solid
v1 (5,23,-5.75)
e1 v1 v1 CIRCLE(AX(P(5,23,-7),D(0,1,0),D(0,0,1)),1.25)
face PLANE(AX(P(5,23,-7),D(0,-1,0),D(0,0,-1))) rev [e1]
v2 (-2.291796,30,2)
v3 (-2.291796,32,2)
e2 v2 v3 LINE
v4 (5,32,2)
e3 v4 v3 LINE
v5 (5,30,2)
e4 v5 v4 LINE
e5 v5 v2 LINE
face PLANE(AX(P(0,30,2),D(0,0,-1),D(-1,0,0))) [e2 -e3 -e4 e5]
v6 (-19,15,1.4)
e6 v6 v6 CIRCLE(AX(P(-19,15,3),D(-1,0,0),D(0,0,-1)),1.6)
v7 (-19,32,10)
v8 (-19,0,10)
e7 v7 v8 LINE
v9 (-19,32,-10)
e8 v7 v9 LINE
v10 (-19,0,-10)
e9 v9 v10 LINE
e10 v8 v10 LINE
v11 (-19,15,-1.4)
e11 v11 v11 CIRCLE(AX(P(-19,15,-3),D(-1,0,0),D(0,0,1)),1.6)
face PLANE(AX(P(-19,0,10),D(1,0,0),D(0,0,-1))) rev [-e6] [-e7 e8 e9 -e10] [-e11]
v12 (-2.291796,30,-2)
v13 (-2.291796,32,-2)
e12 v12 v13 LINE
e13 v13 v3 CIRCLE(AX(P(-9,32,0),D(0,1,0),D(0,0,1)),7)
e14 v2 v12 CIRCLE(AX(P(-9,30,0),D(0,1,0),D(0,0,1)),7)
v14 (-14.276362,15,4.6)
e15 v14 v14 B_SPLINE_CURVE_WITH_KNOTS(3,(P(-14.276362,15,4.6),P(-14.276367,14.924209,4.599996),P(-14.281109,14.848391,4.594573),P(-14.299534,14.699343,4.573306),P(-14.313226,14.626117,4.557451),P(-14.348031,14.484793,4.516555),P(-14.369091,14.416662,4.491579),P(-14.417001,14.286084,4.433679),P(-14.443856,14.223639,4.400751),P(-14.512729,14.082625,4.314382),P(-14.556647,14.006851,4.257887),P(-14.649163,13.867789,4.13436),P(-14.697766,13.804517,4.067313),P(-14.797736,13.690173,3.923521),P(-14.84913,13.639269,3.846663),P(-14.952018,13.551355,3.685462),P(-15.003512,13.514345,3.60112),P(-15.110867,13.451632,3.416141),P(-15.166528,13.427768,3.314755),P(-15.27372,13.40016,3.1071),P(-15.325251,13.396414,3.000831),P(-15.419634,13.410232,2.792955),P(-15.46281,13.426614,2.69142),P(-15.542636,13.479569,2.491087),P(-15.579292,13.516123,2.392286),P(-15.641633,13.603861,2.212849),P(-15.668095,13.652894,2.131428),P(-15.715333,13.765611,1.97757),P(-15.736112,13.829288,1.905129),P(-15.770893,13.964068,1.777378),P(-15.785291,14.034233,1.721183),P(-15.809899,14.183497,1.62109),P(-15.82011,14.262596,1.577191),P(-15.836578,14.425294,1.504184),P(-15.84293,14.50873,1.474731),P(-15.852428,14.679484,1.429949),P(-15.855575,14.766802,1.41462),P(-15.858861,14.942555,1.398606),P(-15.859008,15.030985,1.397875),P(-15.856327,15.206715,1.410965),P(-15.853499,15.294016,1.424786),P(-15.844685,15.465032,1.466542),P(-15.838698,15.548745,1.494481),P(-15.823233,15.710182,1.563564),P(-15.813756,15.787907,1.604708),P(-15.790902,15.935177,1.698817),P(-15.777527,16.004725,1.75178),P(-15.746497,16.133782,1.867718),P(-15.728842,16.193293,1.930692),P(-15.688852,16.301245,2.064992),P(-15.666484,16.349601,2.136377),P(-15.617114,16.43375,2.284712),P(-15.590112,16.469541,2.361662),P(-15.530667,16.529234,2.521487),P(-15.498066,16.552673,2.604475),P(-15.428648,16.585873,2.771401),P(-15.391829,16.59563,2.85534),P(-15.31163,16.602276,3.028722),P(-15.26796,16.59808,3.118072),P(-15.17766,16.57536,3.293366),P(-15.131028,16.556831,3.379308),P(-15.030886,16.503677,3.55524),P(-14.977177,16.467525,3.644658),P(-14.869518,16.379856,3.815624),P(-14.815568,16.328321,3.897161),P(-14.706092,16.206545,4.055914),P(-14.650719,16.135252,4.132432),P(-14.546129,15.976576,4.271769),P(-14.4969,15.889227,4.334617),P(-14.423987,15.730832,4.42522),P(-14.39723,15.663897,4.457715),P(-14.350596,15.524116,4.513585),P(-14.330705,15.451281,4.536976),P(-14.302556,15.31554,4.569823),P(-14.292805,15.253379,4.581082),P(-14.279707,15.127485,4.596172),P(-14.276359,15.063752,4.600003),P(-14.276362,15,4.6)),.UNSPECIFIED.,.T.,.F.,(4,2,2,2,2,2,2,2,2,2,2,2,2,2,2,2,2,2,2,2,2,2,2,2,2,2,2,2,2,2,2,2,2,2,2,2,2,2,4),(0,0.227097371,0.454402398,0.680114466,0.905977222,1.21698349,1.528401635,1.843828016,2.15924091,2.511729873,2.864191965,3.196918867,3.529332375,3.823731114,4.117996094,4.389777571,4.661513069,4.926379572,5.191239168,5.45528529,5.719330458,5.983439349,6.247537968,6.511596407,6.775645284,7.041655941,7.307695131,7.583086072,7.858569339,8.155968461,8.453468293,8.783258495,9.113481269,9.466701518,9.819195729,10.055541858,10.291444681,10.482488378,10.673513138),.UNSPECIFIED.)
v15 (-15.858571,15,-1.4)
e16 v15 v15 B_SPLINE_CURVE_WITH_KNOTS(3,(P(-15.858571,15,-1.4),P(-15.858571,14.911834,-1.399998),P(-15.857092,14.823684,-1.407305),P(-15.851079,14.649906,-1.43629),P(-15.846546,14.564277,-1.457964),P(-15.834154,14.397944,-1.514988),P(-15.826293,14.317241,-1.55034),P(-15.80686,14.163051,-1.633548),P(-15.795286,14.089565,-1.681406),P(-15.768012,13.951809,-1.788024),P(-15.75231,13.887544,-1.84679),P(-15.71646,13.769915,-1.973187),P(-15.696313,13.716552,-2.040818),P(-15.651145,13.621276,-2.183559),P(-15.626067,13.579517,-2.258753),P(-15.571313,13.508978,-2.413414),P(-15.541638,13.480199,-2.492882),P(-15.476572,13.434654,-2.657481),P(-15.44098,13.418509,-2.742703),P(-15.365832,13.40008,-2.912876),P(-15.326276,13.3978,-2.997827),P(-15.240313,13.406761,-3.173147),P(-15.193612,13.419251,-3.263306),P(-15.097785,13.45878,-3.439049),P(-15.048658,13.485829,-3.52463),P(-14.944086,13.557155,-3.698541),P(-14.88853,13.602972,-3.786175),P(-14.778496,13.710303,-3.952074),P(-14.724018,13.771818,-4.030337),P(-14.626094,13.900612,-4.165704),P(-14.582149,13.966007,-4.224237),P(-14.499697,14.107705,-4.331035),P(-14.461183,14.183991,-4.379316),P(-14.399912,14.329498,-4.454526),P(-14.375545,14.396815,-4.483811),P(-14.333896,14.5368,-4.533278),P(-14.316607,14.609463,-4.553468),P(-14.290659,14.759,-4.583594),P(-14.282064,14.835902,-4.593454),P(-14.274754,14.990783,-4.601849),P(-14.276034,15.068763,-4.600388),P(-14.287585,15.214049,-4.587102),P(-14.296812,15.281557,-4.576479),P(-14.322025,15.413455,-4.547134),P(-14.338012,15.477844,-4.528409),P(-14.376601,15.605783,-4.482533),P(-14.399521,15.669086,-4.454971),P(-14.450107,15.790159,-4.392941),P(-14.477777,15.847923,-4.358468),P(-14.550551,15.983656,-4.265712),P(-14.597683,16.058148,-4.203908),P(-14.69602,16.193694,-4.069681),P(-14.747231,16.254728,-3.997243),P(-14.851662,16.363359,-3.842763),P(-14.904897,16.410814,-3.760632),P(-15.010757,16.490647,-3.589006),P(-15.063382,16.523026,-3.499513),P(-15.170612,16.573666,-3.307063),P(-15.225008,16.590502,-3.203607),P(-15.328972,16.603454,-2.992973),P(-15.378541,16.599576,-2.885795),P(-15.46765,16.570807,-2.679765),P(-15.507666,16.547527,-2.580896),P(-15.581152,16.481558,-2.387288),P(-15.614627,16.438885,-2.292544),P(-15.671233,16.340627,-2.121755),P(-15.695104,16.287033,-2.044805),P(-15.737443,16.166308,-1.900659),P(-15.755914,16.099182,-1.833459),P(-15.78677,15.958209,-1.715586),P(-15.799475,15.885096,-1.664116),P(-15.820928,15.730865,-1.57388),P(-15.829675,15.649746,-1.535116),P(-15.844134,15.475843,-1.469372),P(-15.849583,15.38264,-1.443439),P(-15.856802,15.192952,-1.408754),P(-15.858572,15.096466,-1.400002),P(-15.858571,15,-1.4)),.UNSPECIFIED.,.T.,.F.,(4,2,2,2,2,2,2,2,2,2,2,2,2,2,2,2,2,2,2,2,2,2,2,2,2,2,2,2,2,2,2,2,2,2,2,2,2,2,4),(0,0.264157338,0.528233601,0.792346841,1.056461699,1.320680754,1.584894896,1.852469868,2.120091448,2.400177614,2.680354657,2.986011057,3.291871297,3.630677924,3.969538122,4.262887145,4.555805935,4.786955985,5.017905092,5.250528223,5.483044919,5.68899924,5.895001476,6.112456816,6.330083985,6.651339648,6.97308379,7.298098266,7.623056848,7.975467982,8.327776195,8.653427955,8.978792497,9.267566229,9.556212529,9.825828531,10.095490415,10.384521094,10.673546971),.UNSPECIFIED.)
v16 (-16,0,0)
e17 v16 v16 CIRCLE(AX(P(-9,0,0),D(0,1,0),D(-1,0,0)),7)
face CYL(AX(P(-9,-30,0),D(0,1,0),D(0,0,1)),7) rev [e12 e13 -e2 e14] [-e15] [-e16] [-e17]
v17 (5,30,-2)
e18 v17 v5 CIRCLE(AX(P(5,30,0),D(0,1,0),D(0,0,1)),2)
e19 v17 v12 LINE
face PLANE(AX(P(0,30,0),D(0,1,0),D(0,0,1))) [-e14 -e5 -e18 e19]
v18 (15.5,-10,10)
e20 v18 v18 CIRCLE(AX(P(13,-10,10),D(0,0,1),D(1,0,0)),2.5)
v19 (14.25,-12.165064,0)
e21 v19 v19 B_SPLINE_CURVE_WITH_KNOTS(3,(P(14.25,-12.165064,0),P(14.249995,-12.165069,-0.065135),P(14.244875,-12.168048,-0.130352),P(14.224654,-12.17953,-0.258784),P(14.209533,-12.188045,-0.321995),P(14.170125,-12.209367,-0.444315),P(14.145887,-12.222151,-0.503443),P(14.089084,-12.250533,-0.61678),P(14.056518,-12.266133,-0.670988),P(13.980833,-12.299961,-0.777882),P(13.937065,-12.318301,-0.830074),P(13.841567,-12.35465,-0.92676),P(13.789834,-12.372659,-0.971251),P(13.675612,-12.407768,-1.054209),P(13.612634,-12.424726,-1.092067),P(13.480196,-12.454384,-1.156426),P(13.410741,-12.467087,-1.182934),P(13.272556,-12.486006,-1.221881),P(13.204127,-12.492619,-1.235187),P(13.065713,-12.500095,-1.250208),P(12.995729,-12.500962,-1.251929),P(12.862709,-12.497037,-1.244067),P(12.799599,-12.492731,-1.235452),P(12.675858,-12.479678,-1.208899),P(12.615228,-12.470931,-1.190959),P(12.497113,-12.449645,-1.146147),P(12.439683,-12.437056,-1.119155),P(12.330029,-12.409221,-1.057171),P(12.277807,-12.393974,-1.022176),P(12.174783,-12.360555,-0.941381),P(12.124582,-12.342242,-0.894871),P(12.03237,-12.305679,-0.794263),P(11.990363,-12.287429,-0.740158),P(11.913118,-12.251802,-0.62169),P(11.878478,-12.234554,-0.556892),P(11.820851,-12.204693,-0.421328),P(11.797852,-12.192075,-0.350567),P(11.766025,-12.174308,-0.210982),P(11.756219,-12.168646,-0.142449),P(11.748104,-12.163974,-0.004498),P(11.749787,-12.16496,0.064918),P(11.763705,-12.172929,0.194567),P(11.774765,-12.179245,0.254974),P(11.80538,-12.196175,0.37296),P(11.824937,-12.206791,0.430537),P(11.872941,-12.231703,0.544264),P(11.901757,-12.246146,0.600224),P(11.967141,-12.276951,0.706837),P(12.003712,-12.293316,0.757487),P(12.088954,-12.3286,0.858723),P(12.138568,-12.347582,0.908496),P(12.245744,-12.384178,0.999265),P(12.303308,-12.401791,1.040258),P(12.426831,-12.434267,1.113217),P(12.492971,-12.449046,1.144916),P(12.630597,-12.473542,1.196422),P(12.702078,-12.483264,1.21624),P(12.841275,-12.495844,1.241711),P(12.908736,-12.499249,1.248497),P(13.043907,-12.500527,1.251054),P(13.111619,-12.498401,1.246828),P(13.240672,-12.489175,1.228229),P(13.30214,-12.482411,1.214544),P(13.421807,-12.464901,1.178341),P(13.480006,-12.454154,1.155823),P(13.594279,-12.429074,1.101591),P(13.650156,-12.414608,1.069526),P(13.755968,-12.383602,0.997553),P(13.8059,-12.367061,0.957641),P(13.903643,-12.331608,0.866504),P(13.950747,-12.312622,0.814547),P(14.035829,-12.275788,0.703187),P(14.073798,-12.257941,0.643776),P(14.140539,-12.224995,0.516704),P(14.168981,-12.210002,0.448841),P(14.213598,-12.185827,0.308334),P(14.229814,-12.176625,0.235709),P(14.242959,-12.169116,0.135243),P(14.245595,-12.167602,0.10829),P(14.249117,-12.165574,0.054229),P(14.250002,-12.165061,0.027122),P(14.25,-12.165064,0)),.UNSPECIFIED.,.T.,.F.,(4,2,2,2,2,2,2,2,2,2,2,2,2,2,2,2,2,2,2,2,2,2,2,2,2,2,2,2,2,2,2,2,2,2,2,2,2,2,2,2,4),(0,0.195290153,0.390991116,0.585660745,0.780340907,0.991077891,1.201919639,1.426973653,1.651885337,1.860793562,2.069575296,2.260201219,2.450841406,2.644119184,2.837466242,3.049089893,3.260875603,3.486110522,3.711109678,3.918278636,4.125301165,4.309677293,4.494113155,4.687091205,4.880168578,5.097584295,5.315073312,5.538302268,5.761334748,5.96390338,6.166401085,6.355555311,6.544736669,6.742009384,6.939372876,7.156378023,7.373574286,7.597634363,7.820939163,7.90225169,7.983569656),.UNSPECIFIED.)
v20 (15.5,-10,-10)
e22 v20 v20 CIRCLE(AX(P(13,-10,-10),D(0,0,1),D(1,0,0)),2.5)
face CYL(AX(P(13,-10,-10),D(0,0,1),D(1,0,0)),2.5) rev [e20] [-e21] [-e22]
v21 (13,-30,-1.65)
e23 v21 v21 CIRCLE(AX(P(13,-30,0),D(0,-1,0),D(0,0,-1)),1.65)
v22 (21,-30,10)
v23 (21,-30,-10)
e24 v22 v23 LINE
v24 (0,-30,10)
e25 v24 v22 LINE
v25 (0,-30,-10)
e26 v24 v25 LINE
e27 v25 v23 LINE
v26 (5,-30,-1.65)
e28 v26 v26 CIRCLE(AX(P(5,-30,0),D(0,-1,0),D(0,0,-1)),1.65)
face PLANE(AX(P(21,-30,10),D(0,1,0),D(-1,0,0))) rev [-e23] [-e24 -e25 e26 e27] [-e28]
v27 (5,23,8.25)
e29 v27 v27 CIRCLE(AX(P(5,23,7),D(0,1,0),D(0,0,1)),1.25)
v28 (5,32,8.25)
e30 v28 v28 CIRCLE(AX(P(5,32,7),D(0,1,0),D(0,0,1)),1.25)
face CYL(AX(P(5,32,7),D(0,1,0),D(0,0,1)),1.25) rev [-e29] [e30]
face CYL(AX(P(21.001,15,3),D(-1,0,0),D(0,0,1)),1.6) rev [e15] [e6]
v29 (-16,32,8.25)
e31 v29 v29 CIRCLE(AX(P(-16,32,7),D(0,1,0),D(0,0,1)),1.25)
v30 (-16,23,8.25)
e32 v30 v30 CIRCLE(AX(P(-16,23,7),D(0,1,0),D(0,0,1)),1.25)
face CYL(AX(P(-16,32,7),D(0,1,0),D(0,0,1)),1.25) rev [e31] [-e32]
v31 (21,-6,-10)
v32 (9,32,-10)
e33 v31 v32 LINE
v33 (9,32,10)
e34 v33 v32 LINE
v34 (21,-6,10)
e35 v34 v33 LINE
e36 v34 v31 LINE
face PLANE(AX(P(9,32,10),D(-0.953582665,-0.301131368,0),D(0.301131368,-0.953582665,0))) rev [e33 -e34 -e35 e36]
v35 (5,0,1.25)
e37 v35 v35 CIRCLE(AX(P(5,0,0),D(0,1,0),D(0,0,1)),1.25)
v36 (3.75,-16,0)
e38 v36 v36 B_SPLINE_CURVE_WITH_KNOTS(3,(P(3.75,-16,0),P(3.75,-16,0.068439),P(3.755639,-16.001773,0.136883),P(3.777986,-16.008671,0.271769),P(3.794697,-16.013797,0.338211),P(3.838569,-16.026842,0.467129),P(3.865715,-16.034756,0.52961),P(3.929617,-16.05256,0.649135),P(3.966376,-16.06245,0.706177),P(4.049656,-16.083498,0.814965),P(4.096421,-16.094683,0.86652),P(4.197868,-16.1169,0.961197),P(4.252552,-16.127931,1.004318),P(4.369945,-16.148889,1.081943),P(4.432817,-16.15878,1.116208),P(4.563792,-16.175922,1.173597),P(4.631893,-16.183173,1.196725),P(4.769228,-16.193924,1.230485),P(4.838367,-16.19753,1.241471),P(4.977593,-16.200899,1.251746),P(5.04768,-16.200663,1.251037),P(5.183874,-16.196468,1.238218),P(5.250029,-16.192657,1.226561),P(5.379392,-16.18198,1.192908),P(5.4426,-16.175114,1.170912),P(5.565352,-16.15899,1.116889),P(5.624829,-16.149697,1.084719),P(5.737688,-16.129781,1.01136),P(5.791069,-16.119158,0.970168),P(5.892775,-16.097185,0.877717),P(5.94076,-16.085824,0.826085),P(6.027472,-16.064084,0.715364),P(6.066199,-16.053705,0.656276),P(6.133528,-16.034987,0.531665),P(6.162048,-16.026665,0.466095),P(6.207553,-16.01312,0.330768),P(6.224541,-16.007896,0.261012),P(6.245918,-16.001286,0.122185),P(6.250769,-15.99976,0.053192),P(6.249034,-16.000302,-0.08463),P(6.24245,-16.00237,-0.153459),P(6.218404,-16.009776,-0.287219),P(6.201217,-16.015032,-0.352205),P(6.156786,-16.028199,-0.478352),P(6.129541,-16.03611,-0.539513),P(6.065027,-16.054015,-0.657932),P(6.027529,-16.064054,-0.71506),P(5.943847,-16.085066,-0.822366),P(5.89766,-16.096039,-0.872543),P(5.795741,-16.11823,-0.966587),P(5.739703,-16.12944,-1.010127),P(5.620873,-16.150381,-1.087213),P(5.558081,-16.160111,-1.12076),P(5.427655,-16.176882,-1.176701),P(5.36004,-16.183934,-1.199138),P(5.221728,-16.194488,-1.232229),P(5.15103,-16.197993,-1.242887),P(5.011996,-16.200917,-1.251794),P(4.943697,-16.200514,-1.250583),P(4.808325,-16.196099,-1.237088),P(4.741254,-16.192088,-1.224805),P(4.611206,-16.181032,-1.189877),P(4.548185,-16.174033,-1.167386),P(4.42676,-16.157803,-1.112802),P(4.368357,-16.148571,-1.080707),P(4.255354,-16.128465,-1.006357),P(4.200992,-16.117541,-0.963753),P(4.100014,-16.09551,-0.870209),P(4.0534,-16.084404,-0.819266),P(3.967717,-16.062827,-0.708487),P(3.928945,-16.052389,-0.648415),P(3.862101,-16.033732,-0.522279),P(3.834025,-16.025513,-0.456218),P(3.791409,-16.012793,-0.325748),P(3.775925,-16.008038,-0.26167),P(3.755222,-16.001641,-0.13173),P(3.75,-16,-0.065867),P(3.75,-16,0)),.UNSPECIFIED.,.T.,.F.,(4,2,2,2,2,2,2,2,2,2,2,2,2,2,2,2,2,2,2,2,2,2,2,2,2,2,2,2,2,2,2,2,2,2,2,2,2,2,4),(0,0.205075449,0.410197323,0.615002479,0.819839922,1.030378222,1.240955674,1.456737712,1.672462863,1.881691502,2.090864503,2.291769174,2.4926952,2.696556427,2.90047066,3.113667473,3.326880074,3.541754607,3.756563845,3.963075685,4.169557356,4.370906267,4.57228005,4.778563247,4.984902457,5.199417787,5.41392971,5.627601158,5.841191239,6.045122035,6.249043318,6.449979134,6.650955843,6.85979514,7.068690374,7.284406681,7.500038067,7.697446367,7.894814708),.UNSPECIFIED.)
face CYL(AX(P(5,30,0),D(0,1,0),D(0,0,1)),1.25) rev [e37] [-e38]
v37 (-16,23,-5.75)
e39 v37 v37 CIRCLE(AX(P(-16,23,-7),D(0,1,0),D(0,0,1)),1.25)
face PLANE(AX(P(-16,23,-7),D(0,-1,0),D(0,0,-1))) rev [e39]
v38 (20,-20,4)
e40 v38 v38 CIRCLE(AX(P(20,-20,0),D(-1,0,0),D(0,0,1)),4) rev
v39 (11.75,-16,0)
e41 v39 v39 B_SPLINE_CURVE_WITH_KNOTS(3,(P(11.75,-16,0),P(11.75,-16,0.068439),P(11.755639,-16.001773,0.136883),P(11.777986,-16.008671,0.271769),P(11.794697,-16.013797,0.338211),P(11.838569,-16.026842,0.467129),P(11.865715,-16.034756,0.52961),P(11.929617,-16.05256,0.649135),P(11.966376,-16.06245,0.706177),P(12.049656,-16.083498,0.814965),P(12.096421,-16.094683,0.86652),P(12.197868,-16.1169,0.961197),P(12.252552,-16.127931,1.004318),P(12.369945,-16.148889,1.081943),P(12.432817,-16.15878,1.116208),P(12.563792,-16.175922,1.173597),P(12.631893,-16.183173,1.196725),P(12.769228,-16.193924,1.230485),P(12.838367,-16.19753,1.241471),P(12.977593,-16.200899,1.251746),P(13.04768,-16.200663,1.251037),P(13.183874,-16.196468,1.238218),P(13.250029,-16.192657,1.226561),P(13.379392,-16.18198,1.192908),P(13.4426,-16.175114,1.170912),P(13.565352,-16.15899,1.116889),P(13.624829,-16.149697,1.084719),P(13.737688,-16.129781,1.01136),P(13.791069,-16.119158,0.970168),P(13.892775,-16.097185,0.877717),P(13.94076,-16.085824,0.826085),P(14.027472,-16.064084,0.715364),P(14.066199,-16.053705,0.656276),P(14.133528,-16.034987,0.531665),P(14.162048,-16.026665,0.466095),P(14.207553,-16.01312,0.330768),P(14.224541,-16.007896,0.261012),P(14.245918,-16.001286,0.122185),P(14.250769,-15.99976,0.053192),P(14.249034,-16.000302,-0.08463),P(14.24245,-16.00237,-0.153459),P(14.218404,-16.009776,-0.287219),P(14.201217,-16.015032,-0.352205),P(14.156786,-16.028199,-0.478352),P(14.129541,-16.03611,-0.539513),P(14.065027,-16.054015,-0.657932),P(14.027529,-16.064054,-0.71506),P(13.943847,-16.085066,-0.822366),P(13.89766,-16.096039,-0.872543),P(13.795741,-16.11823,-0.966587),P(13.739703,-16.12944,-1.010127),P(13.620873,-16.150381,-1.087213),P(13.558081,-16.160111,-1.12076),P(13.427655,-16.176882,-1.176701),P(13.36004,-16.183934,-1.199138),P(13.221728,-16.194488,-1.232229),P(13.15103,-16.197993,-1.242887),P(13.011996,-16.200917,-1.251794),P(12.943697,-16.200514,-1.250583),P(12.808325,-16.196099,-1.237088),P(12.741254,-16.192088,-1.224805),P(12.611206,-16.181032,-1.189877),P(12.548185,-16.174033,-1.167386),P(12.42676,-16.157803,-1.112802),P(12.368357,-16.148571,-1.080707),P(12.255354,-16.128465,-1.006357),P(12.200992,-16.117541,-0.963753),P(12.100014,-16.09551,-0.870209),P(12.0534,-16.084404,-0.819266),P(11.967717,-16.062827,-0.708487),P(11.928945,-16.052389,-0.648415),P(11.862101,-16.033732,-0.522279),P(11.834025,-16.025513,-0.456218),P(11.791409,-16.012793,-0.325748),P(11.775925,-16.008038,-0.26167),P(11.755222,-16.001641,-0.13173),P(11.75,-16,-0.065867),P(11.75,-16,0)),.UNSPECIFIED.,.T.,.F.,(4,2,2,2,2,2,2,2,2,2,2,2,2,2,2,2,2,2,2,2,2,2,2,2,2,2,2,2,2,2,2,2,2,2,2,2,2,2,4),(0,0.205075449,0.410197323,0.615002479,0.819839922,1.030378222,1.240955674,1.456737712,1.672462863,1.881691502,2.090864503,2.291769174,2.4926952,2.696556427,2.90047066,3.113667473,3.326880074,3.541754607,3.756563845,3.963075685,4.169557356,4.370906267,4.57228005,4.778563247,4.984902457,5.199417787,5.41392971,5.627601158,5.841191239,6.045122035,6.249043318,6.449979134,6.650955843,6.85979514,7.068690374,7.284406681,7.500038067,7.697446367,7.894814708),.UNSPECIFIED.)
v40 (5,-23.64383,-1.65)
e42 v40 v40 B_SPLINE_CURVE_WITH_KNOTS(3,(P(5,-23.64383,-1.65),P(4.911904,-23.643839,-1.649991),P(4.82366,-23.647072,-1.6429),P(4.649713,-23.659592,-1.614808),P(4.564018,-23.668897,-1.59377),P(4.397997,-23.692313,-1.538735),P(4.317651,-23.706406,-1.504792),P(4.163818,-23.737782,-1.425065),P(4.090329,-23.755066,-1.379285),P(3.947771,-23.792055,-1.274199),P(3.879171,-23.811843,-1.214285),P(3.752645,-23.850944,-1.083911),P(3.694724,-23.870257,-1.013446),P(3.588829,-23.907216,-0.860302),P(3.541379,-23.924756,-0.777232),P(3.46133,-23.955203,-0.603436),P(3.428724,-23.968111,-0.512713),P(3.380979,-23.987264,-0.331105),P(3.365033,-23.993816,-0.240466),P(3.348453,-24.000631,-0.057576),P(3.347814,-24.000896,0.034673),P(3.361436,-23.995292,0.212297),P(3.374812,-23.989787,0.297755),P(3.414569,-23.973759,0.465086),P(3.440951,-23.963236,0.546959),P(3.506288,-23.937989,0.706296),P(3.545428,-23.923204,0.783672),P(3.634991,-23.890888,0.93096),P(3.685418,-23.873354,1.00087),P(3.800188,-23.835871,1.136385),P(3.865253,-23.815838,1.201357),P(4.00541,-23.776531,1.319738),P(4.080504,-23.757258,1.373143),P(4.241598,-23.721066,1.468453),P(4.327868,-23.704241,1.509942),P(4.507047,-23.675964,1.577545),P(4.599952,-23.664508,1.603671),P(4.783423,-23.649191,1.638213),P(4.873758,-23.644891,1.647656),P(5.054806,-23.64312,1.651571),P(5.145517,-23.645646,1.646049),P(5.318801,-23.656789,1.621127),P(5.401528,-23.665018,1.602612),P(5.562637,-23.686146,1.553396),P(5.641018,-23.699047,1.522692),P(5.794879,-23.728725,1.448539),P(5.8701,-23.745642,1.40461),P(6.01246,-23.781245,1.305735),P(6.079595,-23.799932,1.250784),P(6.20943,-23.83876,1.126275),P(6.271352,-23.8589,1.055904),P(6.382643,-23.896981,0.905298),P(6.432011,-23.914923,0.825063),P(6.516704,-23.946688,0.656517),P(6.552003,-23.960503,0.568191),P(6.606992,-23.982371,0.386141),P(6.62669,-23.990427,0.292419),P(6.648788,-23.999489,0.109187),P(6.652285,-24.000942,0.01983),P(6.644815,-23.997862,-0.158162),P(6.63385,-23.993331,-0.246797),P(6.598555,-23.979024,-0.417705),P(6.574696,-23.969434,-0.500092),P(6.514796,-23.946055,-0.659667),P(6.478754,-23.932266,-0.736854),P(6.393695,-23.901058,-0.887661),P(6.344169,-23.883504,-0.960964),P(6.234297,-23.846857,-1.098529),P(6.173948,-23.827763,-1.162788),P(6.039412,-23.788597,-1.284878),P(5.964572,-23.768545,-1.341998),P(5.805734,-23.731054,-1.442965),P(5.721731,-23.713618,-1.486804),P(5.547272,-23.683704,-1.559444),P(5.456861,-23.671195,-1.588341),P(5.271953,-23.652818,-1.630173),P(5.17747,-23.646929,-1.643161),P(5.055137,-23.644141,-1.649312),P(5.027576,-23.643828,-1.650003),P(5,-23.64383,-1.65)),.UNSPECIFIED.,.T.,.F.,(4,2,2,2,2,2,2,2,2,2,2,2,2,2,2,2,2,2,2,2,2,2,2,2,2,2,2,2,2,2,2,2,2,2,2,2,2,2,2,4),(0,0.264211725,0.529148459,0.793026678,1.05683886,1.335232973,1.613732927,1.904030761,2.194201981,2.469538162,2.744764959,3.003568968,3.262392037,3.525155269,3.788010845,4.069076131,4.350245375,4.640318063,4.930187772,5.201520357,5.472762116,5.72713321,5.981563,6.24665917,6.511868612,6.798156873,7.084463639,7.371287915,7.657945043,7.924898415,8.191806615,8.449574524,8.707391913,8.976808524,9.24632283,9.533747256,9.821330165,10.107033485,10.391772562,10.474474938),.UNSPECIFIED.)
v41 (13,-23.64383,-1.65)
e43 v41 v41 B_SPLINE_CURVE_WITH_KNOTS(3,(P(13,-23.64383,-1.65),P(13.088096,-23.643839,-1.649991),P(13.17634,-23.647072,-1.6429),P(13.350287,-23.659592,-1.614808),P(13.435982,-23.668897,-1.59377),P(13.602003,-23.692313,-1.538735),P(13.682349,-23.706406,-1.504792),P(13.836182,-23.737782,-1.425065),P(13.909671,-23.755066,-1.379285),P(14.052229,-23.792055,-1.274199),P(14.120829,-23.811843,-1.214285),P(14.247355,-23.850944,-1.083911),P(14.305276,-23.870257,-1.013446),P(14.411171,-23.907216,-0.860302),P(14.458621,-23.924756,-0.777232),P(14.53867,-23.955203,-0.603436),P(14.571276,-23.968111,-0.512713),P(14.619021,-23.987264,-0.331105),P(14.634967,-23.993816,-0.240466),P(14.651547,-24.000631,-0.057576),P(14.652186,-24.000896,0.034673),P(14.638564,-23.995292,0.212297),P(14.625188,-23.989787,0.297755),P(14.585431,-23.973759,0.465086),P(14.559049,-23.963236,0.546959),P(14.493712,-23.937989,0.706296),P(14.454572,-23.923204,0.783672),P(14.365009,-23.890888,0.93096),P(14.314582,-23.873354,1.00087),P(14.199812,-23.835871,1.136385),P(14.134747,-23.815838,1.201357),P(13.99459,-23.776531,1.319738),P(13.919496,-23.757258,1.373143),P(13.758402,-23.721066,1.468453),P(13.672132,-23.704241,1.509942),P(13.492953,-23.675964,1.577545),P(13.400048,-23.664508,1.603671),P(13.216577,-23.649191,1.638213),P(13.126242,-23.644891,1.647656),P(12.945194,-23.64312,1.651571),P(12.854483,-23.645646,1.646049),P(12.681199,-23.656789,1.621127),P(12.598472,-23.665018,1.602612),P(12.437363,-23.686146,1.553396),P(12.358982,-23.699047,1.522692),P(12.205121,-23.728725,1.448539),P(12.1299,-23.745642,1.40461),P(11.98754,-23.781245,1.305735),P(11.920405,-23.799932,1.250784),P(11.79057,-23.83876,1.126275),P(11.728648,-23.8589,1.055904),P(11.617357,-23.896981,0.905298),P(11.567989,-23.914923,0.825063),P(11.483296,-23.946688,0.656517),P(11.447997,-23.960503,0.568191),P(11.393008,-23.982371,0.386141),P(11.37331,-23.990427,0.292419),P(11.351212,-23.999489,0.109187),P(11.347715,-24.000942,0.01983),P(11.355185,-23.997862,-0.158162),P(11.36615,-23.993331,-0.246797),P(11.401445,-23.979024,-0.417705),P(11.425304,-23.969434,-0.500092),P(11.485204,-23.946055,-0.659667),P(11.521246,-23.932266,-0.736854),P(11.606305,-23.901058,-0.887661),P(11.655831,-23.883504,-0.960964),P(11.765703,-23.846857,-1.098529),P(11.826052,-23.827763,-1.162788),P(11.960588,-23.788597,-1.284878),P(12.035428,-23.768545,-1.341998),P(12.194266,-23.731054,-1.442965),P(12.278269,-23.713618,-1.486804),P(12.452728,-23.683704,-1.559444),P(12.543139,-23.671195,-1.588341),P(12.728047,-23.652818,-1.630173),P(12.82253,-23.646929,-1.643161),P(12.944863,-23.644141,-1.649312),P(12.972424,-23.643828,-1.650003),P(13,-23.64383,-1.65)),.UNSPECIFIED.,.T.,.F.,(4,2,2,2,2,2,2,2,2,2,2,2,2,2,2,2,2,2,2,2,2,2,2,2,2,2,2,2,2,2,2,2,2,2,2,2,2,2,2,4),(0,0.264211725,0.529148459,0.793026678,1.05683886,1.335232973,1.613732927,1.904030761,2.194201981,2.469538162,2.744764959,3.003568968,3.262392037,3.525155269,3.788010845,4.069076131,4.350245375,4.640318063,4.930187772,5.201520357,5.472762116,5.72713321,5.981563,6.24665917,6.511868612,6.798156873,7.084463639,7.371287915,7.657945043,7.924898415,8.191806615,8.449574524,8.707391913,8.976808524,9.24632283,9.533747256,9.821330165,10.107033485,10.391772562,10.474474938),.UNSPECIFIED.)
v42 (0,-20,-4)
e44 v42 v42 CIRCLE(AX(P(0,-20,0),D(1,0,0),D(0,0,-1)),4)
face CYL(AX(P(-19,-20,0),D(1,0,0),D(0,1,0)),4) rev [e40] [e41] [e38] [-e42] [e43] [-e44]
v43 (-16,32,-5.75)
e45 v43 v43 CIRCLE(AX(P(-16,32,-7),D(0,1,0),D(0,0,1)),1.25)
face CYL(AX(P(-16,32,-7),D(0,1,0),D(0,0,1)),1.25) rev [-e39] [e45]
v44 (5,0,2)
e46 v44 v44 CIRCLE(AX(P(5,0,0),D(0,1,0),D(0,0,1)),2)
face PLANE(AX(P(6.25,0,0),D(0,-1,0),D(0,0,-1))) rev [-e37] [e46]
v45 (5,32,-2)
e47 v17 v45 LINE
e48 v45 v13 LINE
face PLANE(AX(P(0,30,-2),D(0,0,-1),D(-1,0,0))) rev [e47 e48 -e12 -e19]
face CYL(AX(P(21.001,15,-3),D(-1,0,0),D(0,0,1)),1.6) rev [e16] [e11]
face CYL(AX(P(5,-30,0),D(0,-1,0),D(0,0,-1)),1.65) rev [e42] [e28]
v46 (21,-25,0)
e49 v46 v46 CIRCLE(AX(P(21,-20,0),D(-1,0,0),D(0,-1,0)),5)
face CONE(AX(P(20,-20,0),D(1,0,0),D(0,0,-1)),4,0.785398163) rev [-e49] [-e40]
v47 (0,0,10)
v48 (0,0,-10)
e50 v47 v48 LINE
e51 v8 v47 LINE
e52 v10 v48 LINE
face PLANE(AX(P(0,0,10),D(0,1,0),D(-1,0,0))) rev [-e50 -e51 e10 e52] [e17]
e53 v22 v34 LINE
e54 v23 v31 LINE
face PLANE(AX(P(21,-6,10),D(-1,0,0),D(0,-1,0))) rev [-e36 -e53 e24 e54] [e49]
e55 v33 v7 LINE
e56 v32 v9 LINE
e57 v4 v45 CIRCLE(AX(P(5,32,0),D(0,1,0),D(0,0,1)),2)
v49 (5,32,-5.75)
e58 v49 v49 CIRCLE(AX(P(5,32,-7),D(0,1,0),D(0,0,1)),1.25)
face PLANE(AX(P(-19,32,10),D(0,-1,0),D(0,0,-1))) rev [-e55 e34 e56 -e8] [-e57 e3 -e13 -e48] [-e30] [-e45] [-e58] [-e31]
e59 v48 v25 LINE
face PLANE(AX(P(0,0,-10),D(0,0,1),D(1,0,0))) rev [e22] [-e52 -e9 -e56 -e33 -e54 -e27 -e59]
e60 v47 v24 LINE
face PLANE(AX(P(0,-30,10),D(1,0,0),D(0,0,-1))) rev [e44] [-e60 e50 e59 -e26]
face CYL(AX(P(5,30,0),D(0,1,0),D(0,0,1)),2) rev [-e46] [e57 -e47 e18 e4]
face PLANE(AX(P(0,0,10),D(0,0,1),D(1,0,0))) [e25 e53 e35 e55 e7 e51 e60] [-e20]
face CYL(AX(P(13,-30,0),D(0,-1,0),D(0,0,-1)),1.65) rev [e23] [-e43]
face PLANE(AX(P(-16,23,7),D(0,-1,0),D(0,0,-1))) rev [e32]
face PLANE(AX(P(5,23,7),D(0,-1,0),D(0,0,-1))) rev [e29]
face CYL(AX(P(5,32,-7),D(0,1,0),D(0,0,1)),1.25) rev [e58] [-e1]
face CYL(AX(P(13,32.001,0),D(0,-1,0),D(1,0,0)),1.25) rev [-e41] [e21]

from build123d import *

# Parameters (mm, degrees)
BOSS_EXTRUDE2_DEPTH     = 10
CUT_EXTRUDE1_DEPTH      = 67.219332525
CUT_EXTRUDE2_DEPTH      = 2
M3_TAPPED_HOLE1_D       = 2.5
M3_TAPPED_HOLE1_DEPTH   = 9
SKETCH9_R               = 2.5
CUT_EXTRUDE3_DEPTH      = 44.185645763
SKETCH10_R              = 4
CUT_EXTRUDE4_DEPTH      = 53.191953403
CHAMFER1_SIZE           = 1
CUT_EXTRUDE5_REACH      = 54.192
CUT_EXTRUDE5_END_RADIUS = 7
SKETCH13_R              = 1.6
M4_TAPPED_HOLE1_REACH   = 68.219
M4_TAPPED_HOLE1_BORE_R  = 1.65
CUT_EXTRUDE6_REACH      = 68.219
CUT_EXTRUDE6_END_RADIUS = 2.5
SKETCH19_R              = 1.25


# Read off the part's stored shape, not the designer's step: Hole1
with BuildPart() as part:
    # Sketch4 → Boss-Extrude2 (new, symmetric)
    with BuildSketch(Plane.XY):
        Polygon((0, 0), (-19, 0), (-19, 32), (9, 32), (21, -6), (21, -30), (0, -30), align=None)
    extrude(amount=BOSS_EXTRUDE2_DEPTH, both=True)

    # Sketch6 → Cut-Extrude1 (cut, through all)
    with BuildSketch(Plane(origin=(0, 32, 0), x_dir=(1, 0, 0), z_dir=(0, 1, 0))):
        with BuildLine():
            ThreePointArc((-2.291796068, 2), (-10.010587075, 6.926666858), (-16, 0))
            Line((-16, 0), (-2, 0))
            ThreePointArc((-2, 0), (-2.073333142, 1.010587075), (-2.291796068, 2))
        make_face()
        with BuildLine():
            Line((-2, 0), (-16, 0))
            ThreePointArc((-16, 0), (-10.010587075, -6.926666858), (-2.291796068, -2))
            ThreePointArc((-2.291796068, -2), (-2.073333142, -1.010587075), (-2, 0))
        make_face()
    extrude(amount=-CUT_EXTRUDE1_DEPTH, mode=Mode.SUBTRACT)

    # Sketch6<3> → Cut-Extrude2 (cut)
    with BuildSketch(Plane(origin=(0, 32, 0), x_dir=(1, 0, 0), z_dir=(0, 1, 0))):
        with BuildLine():
            ThreePointArc((5, 2), (3.585786438, 1.414213562), (3, 0))
            Line((3, 0), (7, 0))
            ThreePointArc((7, 0), (6.414213562, 1.414213562), (5, 2))
        make_face()
        with BuildLine():
            Line((7, 0), (3, 0))
            ThreePointArc((3, 0), (3.585786438, -1.414213562), (5, -2))
            ThreePointArc((5, -2), (6.414213562, -1.414213562), (7, 0))
        make_face()
        with BuildLine():
            ThreePointArc((-2.291796068, 2), (-2.073333142, 1.010587075), (-2, 0))
            Line((-2, 0), (3, 0))
            ThreePointArc((3, 0), (3.585786438, 1.414213562), (5, 2))
            Line((5, 2), (-2.291796068, 2))
        make_face()
        with BuildLine():
            Line((3, 0), (-2, 0))
            ThreePointArc((-2, 0), (-2.073333142, -1.010587075), (-2.291796068, -2))
            Line((-2.291796068, -2), (5, -2))
            ThreePointArc((5, -2), (3.585786438, -1.414213562), (3, 0))
        make_face()
    extrude(amount=-CUT_EXTRUDE2_DEPTH, mode=Mode.SUBTRACT)

    # M3 Tapped Hole1
    with Locations(Plane(origin=(0, 32, 0), x_dir=(1, 0, 0), z_dir=(0, 1, 0))):
        with Locations((-16, 7), (-16, -7), (5, -7), (5, 7)):
            Hole(M3_TAPPED_HOLE1_D / 2, depth=M3_TAPPED_HOLE1_DEPTH)

    # Sketch9 → Cut-Extrude3 (cut, through all)
    with BuildSketch(Plane.XY.offset(10)):
        with Locations((13, -10)):
            Circle(SKETCH9_R)
    extrude(amount=-CUT_EXTRUDE3_DEPTH, mode=Mode.SUBTRACT)

    # Sketch10 → Cut-Extrude4 (cut, through all)
    with BuildSketch(Plane(origin=(21, 0, 0), x_dir=(0, 0, -1), z_dir=(1, 0, 0))):
        with Locations(Location((0, -20, 0), (0, 0, 90))):
            Circle(SKETCH10_R)
    extrude(amount=-CUT_EXTRUDE4_DEPTH, mode=Mode.SUBTRACT)

    # Chamfer1
    chamfer1_edges = [part.edges().sort_by_distance(p)[0] for p in [
        (21, -24, 0),
    ]]
    chamfer(chamfer1_edges, length=CHAMFER1_SIZE)

    # Hole1 outline → Hole1 (revolve, cut)
    with BuildSketch(Plane(origin=(5, 0, 0), x_dir=(1, 0, 0), z_dir=(0, 0, 1))):
        Polygon((1.25, 0), (2, 0), (2, 32), (0, 32), (0, -16.200355886), (1.25, -16.200355886), align=None)
    revolve(axis=Axis((5, 0, 0), (0, 1, 0)), mode=Mode.SUBTRACT)

    # Cut-Extrude5: up to this cylinder (the profile starts outside it)
    cut_extrude5_end = Plane(origin=(-9, 15, 0), z_dir=(0, 1, 0)) * Cylinder(CUT_EXTRUDE5_END_RADIUS, 123.384, mode=Mode.PRIVATE)
    # Sketch13 → Cut-Extrude5 (cut, up to the surface)
    with BuildSketch(Plane.ZY.offset(19), mode=Mode.PRIVATE) as cut_extrude5_sk1:
        with Locations((-3, 15)):
            Circle(SKETCH13_R)
    cut_extrude5_tool1 = extrude(cut_extrude5_sk1.sketch, amount=-CUT_EXTRUDE5_REACH, mode=Mode.PRIVATE) - cut_extrude5_end
    add(cut_extrude5_tool1.solids().sort_by_distance((-19, 15, -3))[0], mode=Mode.SUBTRACT)
    # Sketch13 → Cut-Extrude5 (cut, up to the surface)
    with BuildSketch(Plane.ZY.offset(19), mode=Mode.PRIVATE) as cut_extrude5_sk2:
        with Locations((3, 15)):
            Circle(SKETCH13_R)
    cut_extrude5_tool2 = extrude(cut_extrude5_sk2.sketch, amount=-CUT_EXTRUDE5_REACH, mode=Mode.PRIVATE) - cut_extrude5_end
    add(cut_extrude5_tool2.solids().sort_by_distance((-19, 15, 3))[0], mode=Mode.SUBTRACT)

    # M4 Tapped Hole1 bore → M4 Tapped Hole1 (cut, up to next)
    with BuildSketch(Plane(origin=(0, -30, 0), x_dir=(-1, 0, 0), z_dir=(0, -1, 0)), mode=Mode.PRIVATE) as m4_tapped_hole1_sk1:
        with Locations((-13, 0)):
            Circle(M4_TAPPED_HOLE1_BORE_R)
    m4_tapped_hole1_tool1 = extrude(m4_tapped_hole1_sk1.sketch, amount=-M4_TAPPED_HOLE1_REACH, mode=Mode.PRIVATE) & part.part
    # M4 Tapped Hole1 bore → M4 Tapped Hole1 (cut, up to next)
    with BuildSketch(Plane(origin=(0, -30, 0), x_dir=(-1, 0, 0), z_dir=(0, -1, 0)), mode=Mode.PRIVATE) as m4_tapped_hole1_sk2:
        with Locations((-5, 0)):
            Circle(M4_TAPPED_HOLE1_BORE_R)
    m4_tapped_hole1_tool2 = extrude(m4_tapped_hole1_sk2.sketch, amount=-M4_TAPPED_HOLE1_REACH, mode=Mode.PRIVATE) & part.part
    add(m4_tapped_hole1_tool1.solids().sort_by_distance((13, -30, 0))[0], mode=Mode.SUBTRACT)
    add(m4_tapped_hole1_tool2.solids().sort_by_distance((5, -30, 0))[0], mode=Mode.SUBTRACT)

    # Cut-Extrude6: up to this cylinder (the profile starts outside it)
    cut_extrude6_end = Plane(origin=(13, -10, 0), z_dir=(0, 0, 1)) * Cylinder(CUT_EXTRUDE6_END_RADIUS, 142.438, mode=Mode.PRIVATE)
    # Sketch19 → Cut-Extrude6 (cut, up to the surface)
    with BuildSketch(Plane.XZ.offset(30), mode=Mode.PRIVATE) as cut_extrude6_sk1:
        with Locations((13, 0)):
            Circle(SKETCH19_R)
    cut_extrude6_tool1 = extrude(cut_extrude6_sk1.sketch, amount=-CUT_EXTRUDE6_REACH, mode=Mode.PRIVATE) - cut_extrude6_end
    add(cut_extrude6_tool1.solids().sort_by_distance((13, -30, 0))[0], mode=Mode.SUBTRACT)


solid = part.part
